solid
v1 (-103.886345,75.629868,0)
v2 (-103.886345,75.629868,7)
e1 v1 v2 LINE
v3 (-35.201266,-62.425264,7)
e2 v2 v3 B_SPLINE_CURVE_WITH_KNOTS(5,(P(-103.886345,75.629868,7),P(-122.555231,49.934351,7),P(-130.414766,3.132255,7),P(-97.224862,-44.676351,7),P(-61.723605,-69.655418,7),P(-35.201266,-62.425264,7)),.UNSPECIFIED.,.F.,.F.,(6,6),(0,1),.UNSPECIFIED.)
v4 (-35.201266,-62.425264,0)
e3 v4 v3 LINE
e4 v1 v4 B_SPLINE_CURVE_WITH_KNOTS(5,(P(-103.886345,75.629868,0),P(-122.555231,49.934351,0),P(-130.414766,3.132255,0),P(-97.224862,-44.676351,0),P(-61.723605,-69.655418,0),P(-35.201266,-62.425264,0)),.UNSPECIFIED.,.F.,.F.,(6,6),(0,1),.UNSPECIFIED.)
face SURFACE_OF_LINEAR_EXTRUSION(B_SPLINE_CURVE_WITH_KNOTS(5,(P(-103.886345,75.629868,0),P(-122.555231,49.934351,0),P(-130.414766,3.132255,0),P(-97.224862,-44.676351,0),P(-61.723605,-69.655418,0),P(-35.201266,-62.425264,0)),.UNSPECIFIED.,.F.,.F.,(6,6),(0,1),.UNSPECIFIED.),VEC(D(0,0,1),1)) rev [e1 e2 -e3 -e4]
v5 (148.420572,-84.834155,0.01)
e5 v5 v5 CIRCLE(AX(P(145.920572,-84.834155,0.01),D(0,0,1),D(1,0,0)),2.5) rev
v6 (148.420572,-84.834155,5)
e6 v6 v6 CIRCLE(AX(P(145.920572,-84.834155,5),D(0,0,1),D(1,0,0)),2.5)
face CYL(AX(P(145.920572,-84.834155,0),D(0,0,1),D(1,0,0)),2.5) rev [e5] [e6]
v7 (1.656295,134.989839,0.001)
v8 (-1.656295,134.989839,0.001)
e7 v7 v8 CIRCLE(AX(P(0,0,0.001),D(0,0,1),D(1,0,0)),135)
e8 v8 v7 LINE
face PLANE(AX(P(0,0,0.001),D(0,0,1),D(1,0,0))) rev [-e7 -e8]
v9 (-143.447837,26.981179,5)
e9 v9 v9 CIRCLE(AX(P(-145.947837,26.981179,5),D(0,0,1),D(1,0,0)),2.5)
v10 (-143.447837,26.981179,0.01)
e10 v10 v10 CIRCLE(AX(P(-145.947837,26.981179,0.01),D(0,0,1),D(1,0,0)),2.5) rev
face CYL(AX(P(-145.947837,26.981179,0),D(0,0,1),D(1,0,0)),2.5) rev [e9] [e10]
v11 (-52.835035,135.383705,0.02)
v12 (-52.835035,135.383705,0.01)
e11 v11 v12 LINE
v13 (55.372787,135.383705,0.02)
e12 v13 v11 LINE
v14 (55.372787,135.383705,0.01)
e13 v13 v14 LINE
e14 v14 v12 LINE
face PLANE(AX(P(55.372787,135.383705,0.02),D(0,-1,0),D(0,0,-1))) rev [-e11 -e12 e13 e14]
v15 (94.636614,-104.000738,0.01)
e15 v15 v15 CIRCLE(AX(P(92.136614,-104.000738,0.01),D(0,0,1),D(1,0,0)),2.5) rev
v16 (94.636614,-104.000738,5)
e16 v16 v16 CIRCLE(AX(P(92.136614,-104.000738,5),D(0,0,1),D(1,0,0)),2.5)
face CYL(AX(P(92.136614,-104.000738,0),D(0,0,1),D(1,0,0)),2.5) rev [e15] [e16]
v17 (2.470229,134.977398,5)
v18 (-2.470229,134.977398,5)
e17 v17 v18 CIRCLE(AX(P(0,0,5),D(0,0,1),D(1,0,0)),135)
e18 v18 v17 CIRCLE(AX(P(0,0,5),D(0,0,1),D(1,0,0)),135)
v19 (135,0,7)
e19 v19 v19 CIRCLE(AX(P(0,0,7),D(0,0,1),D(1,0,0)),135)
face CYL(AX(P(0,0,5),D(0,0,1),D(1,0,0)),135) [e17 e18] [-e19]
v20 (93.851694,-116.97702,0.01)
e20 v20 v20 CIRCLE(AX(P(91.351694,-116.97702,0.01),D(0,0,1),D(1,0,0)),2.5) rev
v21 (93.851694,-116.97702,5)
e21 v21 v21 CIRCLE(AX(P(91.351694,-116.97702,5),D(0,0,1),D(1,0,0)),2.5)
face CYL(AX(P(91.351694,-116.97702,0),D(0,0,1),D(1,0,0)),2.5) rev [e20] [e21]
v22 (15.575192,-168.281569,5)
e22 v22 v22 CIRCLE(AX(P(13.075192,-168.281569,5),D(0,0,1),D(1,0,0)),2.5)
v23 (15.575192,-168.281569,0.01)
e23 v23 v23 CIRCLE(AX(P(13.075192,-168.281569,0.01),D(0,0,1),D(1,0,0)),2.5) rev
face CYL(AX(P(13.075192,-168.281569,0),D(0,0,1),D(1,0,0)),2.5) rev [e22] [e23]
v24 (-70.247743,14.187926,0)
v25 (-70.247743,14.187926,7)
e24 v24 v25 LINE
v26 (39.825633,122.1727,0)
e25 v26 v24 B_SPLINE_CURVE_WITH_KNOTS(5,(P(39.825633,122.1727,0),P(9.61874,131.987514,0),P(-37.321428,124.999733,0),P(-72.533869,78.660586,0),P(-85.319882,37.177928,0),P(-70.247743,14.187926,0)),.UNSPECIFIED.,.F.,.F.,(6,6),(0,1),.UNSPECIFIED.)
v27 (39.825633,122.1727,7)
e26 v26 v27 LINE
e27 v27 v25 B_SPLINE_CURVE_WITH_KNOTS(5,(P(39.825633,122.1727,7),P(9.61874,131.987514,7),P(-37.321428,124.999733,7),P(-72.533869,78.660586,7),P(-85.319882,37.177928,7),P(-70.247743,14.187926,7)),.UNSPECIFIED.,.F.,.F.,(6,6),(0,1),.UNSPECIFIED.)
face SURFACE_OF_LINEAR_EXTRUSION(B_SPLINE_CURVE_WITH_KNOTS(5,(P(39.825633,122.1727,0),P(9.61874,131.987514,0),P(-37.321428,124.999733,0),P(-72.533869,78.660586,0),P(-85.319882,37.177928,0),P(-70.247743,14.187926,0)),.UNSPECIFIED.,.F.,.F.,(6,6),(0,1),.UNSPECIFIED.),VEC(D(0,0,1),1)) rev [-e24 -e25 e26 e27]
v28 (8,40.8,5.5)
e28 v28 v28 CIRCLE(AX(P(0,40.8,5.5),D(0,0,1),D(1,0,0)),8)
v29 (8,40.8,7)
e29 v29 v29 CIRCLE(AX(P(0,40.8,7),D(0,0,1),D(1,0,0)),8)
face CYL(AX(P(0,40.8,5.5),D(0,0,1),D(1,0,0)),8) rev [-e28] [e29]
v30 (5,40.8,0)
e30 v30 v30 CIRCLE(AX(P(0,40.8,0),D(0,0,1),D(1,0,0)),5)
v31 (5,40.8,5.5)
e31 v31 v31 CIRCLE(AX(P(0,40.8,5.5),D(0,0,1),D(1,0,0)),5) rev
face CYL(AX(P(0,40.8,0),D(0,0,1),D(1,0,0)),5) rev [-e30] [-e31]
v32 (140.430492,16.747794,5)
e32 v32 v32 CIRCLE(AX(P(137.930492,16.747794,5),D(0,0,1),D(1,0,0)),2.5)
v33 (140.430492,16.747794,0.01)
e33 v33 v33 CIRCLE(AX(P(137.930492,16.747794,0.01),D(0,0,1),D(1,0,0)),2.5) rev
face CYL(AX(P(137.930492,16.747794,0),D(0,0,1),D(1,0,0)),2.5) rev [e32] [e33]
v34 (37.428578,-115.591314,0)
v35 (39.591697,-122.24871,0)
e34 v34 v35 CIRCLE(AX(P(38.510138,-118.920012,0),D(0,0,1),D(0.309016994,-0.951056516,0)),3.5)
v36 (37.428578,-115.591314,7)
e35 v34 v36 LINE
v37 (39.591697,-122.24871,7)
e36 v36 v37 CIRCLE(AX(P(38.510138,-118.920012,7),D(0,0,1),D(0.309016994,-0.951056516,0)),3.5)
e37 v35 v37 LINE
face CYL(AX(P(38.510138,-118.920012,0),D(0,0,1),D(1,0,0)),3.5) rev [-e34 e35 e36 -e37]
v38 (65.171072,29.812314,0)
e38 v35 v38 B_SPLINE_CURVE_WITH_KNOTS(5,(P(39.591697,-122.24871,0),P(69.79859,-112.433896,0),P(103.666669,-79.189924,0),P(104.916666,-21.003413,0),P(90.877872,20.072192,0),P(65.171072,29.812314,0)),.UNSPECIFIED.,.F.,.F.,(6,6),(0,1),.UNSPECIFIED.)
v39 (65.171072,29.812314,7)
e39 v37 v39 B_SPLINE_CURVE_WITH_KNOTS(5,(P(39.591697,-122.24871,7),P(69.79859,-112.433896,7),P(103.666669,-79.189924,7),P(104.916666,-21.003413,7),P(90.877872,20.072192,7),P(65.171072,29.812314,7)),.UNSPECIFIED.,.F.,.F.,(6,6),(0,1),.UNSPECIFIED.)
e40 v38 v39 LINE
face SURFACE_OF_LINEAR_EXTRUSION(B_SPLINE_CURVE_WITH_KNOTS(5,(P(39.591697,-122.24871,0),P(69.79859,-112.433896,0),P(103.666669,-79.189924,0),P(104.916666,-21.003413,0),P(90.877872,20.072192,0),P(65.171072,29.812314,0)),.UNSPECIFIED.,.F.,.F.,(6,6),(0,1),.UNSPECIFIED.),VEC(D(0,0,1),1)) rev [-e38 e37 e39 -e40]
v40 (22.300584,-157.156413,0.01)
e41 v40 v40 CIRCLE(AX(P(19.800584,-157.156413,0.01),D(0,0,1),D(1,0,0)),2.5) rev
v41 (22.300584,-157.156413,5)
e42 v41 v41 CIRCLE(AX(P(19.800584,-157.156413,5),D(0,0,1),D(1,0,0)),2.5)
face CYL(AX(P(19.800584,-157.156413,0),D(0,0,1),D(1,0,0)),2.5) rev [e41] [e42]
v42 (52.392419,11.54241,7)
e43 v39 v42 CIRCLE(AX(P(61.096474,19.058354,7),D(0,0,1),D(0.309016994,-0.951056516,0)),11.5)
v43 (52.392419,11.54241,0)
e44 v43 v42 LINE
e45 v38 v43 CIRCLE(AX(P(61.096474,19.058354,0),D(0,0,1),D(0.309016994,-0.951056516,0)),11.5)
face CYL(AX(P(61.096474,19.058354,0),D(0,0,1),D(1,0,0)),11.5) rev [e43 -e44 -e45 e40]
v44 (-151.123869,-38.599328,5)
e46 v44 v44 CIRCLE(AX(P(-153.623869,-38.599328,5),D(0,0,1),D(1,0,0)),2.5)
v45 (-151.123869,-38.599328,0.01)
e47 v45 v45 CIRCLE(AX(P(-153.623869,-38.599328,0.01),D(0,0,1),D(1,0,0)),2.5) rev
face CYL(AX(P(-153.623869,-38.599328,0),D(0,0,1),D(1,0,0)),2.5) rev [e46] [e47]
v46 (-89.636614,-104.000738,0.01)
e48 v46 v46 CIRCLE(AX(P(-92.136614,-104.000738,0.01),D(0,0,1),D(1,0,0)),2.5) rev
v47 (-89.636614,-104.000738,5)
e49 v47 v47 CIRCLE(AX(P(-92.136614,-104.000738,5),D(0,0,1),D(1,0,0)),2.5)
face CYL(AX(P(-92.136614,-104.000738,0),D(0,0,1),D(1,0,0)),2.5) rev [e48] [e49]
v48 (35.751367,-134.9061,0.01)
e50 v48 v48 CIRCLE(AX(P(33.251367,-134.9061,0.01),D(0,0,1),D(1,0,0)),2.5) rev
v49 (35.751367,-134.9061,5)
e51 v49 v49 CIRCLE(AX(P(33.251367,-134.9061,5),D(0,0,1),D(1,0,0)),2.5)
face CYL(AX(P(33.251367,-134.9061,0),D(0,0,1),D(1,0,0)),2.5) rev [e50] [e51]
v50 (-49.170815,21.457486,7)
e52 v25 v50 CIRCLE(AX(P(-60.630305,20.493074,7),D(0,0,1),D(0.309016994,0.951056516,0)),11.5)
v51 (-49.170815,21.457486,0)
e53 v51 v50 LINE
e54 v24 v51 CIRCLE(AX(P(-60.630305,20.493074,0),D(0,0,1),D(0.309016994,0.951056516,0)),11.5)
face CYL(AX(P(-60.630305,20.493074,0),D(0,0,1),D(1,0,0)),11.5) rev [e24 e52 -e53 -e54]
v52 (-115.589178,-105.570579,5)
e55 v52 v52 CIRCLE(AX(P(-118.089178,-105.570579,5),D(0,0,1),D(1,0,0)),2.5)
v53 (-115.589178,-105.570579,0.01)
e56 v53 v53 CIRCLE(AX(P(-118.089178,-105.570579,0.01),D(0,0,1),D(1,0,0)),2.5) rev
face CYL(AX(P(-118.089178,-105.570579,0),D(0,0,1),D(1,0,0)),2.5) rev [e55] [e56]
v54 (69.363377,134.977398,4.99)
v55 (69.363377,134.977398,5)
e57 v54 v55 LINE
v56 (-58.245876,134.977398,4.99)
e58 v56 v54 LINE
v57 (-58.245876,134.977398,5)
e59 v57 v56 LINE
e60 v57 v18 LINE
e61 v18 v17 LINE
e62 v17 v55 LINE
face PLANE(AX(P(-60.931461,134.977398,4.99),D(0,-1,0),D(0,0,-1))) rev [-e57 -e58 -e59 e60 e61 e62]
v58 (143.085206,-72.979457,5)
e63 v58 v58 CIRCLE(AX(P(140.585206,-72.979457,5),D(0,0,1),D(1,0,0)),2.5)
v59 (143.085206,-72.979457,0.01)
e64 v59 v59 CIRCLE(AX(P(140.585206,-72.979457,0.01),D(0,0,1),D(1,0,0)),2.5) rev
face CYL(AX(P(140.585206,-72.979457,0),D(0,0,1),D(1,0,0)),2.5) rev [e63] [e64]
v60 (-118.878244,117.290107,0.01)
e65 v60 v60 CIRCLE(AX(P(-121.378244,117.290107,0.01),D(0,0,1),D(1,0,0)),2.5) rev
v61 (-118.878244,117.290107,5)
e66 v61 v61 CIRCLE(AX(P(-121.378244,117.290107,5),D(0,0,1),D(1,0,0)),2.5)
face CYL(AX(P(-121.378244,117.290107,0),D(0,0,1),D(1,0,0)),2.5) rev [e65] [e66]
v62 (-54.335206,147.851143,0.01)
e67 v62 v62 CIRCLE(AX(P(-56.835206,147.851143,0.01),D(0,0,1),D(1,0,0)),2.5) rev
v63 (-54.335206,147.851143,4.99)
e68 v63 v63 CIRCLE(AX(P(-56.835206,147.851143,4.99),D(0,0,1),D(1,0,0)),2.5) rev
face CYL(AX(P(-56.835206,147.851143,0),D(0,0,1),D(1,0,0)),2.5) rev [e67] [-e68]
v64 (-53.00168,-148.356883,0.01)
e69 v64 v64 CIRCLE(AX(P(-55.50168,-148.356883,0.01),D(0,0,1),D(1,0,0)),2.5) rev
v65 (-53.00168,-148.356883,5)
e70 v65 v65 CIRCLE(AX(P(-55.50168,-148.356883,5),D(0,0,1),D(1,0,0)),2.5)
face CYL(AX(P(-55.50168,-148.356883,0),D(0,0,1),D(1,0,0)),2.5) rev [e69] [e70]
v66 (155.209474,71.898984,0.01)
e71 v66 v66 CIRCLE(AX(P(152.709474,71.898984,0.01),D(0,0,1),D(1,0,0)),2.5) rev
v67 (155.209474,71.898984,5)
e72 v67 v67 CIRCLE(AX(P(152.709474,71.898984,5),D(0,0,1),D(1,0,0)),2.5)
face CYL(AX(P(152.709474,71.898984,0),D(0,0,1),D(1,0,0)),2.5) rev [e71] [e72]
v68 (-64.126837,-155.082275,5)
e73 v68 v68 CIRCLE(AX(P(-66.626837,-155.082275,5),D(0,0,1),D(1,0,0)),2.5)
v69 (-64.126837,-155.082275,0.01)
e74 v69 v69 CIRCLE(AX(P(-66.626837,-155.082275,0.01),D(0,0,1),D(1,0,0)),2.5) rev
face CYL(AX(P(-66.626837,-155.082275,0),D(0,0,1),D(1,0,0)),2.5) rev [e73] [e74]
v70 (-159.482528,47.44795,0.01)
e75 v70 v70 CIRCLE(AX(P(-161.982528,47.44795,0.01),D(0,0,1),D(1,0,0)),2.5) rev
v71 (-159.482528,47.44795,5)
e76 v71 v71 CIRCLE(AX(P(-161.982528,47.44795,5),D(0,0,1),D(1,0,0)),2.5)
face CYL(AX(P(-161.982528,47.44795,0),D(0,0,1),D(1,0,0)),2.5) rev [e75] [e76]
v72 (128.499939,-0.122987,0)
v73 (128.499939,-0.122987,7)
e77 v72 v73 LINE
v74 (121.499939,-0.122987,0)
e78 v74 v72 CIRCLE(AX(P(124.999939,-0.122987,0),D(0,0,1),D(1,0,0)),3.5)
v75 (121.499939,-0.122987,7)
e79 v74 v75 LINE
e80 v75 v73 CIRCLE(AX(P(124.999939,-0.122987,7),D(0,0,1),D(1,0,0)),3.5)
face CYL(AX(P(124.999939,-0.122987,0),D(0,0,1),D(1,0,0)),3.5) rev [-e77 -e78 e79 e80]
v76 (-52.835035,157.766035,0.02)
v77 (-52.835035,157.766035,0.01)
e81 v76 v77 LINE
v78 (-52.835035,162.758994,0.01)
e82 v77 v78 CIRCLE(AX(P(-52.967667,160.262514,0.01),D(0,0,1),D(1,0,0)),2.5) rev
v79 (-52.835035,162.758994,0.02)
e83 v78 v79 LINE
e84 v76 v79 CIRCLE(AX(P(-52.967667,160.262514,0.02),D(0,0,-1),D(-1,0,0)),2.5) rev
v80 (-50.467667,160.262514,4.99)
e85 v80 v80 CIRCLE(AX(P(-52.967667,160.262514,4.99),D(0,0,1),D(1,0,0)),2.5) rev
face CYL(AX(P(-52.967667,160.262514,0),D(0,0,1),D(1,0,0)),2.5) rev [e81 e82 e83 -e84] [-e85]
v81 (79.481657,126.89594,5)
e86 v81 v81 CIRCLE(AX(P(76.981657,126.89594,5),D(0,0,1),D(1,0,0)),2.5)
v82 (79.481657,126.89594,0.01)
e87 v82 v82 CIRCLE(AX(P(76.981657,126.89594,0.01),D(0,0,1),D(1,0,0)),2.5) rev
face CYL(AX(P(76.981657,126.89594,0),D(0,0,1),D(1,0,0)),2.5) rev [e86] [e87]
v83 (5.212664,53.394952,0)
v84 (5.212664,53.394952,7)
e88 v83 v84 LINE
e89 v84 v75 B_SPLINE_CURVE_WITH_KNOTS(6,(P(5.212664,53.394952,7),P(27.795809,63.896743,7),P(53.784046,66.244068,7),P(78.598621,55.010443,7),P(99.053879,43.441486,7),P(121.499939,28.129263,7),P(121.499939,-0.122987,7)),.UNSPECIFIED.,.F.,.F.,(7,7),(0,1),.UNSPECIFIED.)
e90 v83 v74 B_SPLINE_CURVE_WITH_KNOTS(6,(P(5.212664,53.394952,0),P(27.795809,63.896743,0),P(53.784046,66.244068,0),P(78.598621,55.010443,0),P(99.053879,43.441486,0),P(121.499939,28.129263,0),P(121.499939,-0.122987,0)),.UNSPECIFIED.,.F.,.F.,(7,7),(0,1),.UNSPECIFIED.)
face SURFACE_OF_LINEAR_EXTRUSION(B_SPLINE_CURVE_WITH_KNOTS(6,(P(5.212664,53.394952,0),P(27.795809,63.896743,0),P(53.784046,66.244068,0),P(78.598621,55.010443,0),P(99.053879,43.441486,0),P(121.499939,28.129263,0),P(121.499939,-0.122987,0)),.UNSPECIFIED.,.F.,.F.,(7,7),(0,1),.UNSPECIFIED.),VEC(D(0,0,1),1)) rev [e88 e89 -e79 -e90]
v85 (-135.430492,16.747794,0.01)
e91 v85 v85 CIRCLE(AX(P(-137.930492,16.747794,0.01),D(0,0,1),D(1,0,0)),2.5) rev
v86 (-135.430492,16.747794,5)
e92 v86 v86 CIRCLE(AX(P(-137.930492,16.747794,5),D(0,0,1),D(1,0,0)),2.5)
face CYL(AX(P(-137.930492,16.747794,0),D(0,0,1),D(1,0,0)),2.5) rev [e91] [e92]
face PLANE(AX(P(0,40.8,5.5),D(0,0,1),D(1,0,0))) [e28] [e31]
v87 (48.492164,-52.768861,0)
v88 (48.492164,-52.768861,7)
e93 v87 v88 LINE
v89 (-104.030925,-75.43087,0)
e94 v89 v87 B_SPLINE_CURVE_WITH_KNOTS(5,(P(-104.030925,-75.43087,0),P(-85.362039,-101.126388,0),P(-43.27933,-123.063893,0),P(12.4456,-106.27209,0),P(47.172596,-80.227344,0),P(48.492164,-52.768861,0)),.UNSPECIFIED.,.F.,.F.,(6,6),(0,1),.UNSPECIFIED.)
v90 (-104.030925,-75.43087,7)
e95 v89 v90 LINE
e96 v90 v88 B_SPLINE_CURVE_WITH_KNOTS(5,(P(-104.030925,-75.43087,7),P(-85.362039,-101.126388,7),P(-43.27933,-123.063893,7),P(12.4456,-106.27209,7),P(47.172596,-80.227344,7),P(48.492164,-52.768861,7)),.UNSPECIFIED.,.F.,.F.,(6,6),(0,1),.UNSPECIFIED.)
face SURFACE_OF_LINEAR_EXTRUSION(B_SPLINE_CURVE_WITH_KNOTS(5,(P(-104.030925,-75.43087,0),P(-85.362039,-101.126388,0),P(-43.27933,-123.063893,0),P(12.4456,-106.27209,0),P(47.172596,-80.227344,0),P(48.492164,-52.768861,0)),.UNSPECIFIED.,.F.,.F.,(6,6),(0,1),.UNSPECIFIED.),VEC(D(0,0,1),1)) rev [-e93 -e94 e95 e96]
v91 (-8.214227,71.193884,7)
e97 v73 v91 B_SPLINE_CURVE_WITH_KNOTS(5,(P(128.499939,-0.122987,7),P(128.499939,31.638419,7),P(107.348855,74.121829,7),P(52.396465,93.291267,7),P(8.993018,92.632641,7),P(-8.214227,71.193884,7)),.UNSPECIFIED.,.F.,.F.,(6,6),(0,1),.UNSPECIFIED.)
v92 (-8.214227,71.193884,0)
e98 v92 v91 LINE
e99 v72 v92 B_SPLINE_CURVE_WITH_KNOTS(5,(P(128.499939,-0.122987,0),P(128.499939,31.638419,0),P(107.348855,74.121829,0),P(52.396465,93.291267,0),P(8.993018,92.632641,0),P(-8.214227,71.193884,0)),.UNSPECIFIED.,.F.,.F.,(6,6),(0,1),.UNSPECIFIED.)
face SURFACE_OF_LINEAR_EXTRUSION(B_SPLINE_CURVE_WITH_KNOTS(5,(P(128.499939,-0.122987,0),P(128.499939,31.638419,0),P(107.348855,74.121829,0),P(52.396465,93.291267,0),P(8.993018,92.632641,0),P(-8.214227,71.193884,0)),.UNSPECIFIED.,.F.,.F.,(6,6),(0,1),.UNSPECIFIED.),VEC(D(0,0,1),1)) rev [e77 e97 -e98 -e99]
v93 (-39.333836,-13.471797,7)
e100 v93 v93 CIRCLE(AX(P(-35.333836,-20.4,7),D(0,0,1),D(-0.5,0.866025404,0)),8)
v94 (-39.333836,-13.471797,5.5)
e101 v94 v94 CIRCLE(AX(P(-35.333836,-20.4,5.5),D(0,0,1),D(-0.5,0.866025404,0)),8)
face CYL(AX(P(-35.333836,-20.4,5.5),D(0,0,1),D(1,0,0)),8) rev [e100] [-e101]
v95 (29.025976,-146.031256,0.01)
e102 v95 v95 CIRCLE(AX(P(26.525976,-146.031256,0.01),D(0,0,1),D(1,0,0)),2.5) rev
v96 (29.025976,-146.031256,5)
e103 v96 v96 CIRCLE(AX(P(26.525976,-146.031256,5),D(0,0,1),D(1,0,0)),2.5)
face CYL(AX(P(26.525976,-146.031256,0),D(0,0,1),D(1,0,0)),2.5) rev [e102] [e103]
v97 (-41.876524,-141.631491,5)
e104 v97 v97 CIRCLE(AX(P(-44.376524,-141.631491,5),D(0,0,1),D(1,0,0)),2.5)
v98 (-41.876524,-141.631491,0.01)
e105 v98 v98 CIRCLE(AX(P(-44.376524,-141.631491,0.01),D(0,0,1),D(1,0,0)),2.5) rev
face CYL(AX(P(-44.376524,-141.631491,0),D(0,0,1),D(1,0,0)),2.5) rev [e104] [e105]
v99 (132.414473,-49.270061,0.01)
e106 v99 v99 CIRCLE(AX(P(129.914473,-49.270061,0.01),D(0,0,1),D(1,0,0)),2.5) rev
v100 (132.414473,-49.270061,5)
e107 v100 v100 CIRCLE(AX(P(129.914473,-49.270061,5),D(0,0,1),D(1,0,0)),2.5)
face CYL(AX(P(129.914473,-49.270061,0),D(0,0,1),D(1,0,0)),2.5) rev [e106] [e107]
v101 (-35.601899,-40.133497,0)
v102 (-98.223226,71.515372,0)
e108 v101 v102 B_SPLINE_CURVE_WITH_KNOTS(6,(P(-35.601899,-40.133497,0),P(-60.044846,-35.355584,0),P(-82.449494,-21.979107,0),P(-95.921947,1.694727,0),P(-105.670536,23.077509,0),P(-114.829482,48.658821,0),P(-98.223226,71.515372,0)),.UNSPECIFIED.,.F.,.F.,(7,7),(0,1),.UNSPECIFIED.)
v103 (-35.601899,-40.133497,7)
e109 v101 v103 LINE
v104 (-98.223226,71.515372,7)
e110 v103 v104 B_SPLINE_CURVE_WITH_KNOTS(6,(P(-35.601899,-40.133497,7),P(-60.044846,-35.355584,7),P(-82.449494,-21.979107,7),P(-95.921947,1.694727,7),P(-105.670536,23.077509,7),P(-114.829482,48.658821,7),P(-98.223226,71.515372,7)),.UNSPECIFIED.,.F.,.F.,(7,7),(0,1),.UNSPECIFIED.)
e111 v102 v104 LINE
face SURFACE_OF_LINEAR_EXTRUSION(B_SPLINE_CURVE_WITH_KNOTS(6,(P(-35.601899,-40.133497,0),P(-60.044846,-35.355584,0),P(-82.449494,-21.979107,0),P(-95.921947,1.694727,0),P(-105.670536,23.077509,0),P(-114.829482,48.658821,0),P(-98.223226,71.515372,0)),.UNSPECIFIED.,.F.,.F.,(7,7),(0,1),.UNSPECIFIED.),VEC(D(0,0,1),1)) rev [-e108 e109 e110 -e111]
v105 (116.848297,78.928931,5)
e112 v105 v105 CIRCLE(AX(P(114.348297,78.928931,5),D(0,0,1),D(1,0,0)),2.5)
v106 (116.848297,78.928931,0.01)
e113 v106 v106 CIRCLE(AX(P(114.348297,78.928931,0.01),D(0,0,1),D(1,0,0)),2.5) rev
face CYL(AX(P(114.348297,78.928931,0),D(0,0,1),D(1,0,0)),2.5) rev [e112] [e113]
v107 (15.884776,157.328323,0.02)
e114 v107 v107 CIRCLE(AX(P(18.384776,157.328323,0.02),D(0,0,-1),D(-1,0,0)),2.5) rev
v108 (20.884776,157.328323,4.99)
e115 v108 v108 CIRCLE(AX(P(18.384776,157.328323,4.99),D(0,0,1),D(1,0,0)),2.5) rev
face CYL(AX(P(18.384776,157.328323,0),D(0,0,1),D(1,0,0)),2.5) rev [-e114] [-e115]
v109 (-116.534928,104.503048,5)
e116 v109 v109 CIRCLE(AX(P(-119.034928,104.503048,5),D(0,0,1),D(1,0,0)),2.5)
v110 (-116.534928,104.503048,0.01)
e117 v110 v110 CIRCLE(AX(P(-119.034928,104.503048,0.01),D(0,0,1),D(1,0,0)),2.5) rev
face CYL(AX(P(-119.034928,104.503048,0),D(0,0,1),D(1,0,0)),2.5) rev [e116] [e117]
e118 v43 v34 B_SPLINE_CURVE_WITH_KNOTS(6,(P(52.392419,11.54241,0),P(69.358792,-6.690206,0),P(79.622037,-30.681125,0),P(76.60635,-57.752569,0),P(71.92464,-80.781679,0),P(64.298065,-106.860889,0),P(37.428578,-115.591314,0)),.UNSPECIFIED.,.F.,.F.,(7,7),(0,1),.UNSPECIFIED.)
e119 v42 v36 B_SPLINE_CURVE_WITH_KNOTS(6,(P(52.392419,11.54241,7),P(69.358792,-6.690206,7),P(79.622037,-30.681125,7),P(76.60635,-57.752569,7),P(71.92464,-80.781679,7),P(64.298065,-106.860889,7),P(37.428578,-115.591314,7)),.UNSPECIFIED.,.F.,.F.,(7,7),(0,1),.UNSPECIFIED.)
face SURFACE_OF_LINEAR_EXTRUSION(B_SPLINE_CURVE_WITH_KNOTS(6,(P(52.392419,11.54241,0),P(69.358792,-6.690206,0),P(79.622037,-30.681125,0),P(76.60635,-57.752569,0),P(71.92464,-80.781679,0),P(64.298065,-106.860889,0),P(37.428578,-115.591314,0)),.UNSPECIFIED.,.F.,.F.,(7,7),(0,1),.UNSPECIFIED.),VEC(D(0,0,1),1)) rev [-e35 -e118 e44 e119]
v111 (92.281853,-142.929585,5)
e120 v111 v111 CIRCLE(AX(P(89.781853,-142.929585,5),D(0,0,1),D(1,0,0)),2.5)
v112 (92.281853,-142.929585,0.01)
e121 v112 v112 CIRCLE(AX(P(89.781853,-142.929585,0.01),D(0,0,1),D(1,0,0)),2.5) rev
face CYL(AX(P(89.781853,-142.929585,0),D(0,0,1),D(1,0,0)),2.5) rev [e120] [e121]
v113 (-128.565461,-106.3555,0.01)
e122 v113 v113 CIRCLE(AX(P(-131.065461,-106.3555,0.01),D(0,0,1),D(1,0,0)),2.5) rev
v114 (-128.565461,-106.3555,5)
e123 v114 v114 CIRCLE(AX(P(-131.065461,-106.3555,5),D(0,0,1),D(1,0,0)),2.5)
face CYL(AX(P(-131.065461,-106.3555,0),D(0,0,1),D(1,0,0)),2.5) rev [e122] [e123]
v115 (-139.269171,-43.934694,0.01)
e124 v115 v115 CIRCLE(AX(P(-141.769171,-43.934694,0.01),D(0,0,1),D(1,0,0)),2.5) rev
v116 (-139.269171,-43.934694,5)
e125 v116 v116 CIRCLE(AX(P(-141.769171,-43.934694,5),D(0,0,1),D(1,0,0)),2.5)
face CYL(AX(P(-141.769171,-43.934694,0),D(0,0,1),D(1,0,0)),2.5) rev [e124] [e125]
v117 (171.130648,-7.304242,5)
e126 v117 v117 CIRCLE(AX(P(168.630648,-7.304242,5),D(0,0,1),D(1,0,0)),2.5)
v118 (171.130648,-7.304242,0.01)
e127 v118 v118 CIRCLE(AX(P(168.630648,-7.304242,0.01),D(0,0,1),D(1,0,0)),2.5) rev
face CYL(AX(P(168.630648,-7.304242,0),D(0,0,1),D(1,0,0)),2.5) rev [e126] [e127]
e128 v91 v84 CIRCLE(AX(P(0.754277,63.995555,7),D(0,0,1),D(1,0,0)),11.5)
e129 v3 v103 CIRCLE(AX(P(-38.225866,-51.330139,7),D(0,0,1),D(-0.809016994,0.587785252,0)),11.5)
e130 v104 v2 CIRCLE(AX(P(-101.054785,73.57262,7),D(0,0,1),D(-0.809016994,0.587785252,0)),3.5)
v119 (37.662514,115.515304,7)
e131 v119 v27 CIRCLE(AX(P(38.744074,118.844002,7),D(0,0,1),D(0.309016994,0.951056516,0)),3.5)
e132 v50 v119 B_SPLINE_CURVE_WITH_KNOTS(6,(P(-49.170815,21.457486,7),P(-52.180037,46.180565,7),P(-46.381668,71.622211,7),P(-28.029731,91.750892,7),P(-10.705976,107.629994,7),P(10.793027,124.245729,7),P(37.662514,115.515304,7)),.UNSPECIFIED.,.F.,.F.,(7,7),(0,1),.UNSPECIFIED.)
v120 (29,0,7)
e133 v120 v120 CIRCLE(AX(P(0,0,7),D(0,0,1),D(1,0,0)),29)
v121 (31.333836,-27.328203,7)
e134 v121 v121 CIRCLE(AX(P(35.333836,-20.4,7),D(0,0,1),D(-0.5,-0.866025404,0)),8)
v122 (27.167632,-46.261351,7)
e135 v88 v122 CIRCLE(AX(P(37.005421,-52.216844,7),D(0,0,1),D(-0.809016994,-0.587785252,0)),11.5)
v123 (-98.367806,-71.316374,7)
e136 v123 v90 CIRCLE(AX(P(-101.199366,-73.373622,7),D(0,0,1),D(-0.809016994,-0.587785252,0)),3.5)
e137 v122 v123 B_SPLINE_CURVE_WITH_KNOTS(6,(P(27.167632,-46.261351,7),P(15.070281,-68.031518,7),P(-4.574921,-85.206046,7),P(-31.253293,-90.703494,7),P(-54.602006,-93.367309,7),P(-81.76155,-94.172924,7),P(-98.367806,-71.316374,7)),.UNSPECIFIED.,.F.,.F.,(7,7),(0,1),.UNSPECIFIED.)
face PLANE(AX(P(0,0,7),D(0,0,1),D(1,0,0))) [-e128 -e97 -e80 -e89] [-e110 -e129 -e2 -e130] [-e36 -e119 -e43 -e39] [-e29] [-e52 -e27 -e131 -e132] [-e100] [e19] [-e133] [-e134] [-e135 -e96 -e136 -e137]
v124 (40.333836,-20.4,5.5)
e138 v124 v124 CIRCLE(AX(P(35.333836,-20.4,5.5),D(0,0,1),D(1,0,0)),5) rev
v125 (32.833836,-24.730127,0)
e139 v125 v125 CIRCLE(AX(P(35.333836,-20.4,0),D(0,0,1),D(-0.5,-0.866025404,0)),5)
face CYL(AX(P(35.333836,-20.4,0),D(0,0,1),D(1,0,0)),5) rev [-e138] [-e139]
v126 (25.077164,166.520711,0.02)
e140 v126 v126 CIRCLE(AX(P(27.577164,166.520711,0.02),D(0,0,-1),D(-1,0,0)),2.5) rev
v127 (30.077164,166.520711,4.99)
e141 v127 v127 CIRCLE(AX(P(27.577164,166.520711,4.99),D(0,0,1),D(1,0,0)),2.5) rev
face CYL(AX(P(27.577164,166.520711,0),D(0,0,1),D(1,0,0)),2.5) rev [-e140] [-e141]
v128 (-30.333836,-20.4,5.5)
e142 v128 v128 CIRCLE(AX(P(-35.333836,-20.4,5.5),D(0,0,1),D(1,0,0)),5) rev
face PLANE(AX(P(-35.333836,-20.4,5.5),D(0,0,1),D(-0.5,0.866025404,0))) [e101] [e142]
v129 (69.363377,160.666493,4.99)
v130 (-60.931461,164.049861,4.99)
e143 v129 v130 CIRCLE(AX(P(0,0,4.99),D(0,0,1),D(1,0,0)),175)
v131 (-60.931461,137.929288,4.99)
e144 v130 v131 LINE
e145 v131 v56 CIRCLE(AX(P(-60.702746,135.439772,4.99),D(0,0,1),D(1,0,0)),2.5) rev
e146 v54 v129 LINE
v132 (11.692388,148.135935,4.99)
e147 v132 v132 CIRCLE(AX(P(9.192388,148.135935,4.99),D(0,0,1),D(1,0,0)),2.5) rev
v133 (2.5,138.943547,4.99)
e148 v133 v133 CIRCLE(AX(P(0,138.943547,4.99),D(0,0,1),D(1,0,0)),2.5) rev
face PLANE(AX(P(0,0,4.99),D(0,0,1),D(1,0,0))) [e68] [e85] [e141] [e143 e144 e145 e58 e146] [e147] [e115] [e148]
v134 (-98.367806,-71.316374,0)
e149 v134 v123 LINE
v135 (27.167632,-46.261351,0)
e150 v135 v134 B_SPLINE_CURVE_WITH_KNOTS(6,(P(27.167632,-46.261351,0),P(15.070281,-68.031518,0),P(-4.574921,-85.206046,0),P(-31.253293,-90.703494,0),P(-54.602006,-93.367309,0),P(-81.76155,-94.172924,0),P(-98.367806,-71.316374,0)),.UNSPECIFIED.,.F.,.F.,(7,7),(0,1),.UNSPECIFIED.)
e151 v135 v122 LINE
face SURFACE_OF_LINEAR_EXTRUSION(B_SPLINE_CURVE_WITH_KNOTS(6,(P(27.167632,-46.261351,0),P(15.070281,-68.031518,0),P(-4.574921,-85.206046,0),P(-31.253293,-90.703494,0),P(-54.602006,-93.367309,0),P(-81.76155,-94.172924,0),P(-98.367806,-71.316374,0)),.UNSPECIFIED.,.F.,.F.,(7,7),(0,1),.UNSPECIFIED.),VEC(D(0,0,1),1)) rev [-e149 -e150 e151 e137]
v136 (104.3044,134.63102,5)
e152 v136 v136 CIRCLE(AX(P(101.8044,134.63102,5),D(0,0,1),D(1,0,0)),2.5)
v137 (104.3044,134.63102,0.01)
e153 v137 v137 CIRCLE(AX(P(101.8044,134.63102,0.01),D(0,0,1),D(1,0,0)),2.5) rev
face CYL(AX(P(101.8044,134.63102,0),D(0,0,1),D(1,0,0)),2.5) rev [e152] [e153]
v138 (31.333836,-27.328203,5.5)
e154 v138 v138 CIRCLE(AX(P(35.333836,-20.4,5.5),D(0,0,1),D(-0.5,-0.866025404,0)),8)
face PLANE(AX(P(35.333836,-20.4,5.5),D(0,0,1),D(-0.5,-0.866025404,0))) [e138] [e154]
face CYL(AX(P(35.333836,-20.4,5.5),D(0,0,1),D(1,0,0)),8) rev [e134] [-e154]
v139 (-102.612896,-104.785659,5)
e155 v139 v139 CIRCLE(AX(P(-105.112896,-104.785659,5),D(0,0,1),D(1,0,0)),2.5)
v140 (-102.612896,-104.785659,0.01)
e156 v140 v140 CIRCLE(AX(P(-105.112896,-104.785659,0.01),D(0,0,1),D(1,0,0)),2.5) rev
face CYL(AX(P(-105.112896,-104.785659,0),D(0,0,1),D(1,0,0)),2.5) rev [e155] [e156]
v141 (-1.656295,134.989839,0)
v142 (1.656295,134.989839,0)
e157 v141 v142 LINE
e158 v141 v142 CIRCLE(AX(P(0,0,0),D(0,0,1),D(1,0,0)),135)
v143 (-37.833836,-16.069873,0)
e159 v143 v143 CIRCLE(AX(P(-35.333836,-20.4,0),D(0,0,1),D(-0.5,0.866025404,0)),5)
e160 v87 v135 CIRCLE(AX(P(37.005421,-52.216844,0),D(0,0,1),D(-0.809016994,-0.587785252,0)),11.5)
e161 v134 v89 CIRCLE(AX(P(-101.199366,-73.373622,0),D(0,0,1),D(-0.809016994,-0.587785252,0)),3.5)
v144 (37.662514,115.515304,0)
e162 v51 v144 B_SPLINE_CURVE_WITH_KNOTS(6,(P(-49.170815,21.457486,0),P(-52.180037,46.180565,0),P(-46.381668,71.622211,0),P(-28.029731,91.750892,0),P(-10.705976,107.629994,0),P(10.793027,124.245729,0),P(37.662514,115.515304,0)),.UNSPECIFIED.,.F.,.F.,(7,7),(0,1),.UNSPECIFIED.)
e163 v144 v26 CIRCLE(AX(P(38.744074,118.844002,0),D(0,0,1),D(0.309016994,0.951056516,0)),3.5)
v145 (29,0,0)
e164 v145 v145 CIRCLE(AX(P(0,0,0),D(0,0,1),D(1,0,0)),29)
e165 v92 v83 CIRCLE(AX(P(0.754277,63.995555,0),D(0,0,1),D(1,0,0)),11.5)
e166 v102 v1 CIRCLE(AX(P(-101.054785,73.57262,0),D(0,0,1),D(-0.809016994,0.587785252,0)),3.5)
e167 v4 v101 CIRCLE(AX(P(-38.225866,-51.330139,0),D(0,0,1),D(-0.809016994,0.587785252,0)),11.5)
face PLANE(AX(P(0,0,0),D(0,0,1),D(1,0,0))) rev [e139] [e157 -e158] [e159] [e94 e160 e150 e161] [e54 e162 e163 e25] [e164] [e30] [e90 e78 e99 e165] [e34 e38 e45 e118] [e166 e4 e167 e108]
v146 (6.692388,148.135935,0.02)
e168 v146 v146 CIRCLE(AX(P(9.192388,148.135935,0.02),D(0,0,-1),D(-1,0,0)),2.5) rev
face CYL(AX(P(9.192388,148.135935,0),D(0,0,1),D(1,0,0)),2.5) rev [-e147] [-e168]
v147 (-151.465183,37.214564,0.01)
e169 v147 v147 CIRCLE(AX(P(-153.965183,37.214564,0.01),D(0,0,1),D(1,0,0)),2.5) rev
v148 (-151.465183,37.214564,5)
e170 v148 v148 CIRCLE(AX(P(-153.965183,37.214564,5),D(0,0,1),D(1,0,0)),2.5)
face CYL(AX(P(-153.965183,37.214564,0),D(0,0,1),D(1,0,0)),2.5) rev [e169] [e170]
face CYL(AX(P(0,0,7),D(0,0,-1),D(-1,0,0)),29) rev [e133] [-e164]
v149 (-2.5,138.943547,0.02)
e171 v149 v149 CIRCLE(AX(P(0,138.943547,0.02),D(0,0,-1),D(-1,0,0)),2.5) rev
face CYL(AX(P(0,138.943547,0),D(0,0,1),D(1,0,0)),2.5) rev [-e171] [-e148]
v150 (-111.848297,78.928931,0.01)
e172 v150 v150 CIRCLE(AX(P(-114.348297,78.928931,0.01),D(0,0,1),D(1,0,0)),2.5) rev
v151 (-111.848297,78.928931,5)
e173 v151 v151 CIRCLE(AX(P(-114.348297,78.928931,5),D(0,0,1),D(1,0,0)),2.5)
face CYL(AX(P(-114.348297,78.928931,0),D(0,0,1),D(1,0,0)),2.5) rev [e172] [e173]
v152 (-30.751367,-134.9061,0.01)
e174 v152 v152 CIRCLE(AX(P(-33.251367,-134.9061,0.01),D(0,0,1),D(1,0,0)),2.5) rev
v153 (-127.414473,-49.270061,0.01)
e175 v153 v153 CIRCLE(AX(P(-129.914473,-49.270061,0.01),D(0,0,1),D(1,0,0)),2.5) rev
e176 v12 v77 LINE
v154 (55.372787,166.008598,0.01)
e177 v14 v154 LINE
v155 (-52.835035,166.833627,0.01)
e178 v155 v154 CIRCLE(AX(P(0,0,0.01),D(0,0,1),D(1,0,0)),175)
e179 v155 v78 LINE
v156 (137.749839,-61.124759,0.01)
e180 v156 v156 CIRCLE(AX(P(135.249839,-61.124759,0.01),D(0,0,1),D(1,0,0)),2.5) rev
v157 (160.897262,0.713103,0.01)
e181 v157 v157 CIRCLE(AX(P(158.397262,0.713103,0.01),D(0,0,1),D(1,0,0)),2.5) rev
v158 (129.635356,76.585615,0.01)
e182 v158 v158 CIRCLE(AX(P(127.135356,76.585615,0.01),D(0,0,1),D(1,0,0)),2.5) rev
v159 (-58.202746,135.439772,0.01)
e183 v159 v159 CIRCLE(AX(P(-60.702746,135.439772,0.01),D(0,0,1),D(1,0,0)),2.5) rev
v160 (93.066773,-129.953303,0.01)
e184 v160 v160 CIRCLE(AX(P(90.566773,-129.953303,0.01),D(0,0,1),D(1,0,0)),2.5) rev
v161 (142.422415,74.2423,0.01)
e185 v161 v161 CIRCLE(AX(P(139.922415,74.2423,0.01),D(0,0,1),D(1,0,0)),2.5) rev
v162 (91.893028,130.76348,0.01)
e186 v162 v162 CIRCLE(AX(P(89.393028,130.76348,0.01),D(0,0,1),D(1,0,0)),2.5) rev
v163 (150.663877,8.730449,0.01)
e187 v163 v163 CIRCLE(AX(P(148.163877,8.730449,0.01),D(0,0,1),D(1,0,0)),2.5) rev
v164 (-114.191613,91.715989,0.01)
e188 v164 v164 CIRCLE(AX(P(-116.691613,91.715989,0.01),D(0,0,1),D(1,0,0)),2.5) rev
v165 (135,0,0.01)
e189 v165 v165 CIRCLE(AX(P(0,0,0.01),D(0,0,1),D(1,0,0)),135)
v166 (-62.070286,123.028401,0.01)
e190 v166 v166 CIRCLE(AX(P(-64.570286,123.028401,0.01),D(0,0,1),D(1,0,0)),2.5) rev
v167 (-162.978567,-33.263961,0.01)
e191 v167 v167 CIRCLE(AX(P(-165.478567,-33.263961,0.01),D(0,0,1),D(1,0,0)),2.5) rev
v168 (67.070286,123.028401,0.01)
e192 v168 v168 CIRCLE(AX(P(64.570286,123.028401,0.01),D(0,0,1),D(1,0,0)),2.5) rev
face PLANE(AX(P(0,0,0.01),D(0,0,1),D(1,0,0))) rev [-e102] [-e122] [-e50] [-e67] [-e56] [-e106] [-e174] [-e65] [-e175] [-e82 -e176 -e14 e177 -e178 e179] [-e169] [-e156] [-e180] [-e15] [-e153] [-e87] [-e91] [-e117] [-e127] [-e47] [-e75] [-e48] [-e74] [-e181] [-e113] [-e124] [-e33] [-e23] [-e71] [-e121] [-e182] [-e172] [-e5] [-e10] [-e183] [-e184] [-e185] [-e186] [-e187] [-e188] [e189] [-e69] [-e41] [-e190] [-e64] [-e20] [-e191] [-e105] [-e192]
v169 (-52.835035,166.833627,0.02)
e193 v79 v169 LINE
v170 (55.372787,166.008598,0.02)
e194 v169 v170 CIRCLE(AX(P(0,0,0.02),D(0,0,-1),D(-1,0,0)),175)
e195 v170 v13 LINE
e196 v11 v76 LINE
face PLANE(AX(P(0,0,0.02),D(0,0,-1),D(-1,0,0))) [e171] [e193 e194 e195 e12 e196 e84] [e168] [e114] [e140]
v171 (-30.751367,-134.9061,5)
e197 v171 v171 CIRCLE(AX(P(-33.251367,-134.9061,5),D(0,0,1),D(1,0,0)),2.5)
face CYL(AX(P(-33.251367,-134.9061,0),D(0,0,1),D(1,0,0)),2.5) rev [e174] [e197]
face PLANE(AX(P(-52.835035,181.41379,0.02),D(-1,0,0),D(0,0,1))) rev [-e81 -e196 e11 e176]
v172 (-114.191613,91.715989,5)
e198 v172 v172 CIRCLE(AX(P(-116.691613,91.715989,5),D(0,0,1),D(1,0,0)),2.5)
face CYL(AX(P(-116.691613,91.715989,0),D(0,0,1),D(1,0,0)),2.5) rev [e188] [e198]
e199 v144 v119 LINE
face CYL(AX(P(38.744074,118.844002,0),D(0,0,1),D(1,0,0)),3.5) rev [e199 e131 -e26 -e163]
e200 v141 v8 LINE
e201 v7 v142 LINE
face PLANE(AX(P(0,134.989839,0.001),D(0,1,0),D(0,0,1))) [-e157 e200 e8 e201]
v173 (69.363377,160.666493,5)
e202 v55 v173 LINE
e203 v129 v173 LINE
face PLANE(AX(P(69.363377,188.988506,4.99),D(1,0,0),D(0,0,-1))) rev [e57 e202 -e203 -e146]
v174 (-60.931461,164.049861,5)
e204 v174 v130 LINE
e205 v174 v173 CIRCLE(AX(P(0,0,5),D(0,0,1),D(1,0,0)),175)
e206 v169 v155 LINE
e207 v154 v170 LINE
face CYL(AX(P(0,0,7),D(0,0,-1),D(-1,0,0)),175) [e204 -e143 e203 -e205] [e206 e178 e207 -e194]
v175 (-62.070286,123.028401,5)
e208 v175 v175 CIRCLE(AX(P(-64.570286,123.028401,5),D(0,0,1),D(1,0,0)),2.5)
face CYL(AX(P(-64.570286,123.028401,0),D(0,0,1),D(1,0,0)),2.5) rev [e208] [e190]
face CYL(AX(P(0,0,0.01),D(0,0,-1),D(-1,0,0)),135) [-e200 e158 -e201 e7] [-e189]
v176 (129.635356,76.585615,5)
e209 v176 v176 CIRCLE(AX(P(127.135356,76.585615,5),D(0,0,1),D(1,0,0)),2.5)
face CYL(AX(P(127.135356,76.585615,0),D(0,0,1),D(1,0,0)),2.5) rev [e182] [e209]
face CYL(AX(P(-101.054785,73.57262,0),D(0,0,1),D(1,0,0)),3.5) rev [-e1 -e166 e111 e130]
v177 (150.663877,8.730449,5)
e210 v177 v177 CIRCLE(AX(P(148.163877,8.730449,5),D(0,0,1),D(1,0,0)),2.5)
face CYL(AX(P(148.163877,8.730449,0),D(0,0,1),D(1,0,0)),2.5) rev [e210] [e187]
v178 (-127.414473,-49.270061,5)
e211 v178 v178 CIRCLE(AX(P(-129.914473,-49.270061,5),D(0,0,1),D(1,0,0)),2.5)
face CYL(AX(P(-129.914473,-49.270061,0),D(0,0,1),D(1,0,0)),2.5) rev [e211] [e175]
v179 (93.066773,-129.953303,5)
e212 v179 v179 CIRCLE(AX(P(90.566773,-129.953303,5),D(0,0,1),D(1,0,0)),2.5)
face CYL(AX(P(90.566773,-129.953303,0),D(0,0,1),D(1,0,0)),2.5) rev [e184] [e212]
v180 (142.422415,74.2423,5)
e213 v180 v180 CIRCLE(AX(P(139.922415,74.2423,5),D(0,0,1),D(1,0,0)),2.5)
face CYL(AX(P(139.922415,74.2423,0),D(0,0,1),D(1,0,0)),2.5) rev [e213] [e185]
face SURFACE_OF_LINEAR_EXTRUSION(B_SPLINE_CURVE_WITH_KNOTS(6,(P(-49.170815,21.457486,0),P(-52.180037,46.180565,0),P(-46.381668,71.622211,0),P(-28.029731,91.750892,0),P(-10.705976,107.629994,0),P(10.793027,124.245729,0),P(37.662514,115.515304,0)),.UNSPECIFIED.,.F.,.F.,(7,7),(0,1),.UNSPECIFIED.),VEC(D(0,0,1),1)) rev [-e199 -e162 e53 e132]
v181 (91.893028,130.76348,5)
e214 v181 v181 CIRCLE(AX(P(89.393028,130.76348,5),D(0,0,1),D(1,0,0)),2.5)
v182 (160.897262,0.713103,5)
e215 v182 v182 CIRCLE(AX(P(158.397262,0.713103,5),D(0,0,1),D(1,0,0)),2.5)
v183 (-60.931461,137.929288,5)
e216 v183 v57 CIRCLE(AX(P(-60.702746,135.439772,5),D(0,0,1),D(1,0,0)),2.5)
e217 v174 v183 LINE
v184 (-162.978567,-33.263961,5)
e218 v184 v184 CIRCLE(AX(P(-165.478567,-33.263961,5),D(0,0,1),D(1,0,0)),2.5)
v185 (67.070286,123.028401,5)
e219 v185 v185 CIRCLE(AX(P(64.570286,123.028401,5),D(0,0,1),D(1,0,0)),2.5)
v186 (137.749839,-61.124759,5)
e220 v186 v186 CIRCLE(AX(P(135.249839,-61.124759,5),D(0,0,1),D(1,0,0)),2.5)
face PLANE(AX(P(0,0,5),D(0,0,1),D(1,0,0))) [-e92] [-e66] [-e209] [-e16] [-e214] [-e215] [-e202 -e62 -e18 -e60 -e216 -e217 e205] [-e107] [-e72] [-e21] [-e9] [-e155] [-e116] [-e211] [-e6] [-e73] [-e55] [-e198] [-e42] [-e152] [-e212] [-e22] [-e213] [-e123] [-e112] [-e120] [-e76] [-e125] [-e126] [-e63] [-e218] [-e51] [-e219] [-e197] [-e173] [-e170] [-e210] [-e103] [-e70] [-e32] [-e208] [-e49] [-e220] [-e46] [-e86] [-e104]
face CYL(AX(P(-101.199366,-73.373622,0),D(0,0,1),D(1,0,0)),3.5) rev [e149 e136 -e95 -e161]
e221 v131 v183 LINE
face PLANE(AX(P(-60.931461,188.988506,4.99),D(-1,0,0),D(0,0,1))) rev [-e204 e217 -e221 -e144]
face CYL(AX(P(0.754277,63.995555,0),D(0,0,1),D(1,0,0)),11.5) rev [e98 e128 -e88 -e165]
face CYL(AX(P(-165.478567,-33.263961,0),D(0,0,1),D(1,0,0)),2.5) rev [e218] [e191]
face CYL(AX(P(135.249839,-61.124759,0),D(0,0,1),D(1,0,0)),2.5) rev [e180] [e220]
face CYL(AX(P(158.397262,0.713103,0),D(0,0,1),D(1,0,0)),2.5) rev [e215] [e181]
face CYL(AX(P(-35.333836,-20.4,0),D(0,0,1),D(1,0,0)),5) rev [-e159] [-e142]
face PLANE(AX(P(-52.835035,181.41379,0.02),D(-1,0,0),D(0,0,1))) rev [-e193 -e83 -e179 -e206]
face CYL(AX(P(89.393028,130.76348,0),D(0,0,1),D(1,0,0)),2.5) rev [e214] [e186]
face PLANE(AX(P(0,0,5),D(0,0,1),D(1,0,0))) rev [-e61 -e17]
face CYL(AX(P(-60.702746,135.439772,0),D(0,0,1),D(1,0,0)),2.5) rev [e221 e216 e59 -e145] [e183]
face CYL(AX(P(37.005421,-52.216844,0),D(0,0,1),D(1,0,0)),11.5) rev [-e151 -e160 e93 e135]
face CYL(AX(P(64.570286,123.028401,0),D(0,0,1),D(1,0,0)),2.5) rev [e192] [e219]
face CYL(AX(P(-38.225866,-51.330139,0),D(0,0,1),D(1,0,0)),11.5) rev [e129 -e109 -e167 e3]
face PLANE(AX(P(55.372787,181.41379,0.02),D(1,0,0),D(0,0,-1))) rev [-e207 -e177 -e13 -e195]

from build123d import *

# Parameters (mm, degrees)
SKETCH1_R           = 175
SKETCH1_R_2         = 29
BOSS_EXTRUDE1_DEPTH = 7
CUT_EXTRUDE1_START  = -2
SKETCH2_R           = 175
SKETCH2_R_2         = 135
CUT_EXTRUDE1_DEPTH  = 2
SKETCH3_R           = 5
CUT_EXTRUDE2_DEPTH  = 248.586348574
CIRPATTERN1_COUNT   = 3
SKETCH4_R           = 8
CUT_EXTRUDE3_DEPTH  = 1.5
CIRPATTERN2_COUNT   = 3
CUT_EXTRUDE5_START  = -7
CUT_EXTRUDE5_DEPTH  = 7
CIRPATTERN3_COUNT   = 5
SKETCH6_R           = 2.5
CUT_EXTRUDE6_DEPTH  = 248.586348718
CIRPATTERN4_COUNT   = 13
SKETCH8_R           = 175
SKETCH8_R_2         = 135
CUT_EXTRUDE7_DEPTH  = 0.01
SKETCH9_W           = 90.900327039
SKETCH9_H           = 40.914041524
CUT_EXTRUDE8_DEPTH  = 0.001
SKETCH10_W          = 130.294838349
SKETCH10_H          = 54.011108205
CUT_EXTRUDE9_DEPTH  = 0.01
SKETCH11_W          = 108.207821592
SKETCH11_H          = 46.030085343
CUT_EXTRUDE10_DEPTH = 0.01


# Read off the part's stored shape, not the designer's step: Cut-Extrude5
with BuildPart() as part:
    # Sketch1 → Boss-Extrude1 (new body)
    with BuildSketch(Plane.XY):
        Circle(SKETCH1_R)
        Circle(SKETCH1_R_2, mode=Mode.SUBTRACT)
    extrude(amount=BOSS_EXTRUDE1_DEPTH)

    # Sketch2 → Cut-Extrude1 (cut)
    with BuildSketch(Plane.XY.offset(7).offset(CUT_EXTRUDE1_START)):
        Circle(SKETCH2_R)
        Circle(SKETCH2_R_2, mode=Mode.SUBTRACT)
    extrude(amount=CUT_EXTRUDE1_DEPTH, mode=Mode.SUBTRACT)

    # Sketch3 → Cut-Extrude2 (cut, through all)
    with BuildSketch(Plane.XY.offset(7)):
        with Locations((0, 40.8)):
            Circle(SKETCH3_R)
    cut_extrude2 = extrude(amount=-CUT_EXTRUDE2_DEPTH, mode=Mode.SUBTRACT)

    # CirPattern1: Cut-Extrude2 ×3 about axis
    cirpattern1_axis = Axis((0, 0, 0), (0, 0, 1))
    for i in range(1, CIRPATTERN1_COUNT):
        add(cut_extrude2.rotate(cirpattern1_axis, i * 360 / CIRPATTERN1_COUNT), mode=Mode.SUBTRACT)

    # Sketch4 → Cut-Extrude3 (cut)
    with BuildSketch(Plane.XY.offset(7)):
        with Locations((0, 40.8)):
            Circle(SKETCH4_R)
    cut_extrude3 = extrude(amount=-CUT_EXTRUDE3_DEPTH, mode=Mode.SUBTRACT)

    # CirPattern2: Cut-Extrude3 ×3 about axis
    cirpattern2_axis = Axis((0, 0, 0), (0, 0, 1))
    for i in range(1, CIRPATTERN2_COUNT):
        add(cut_extrude3.rotate(cirpattern2_axis, i * 360 / CIRPATTERN2_COUNT), mode=Mode.SUBTRACT)

    # Cut-Extrude5 outline → Cut-Extrude5 (cut)
    with BuildSketch(Plane.XY.offset(7).offset(CUT_EXTRUDE5_START)):
        with BuildLine():
            ThreePointArc((121.499939496, -0.12298749), (124.999939496, -3.62298749), (128.499939496, -0.12298749))
            add(Edge.make_bspline(
                [(128.499939496, -0.12298749), (128.499939496, 31.638419222), (107.348855254, 74.121828628), (52.396465064, 93.291267066), (8.993017656, 92.632641356), (-8.214226951, 71.193884394)],
                knots=[0, 0, 0, 0, 0, 0, 1, 1, 1, 1, 1, 1], degree=5))
            ThreePointArc((-8.214226951, 71.193884394), (-8.426452431, 57.069934817), (5.212663873, 53.394952133))
            add(Edge.make_bspline(
                [(5.212663873, 53.394952133), (27.795809489, 63.896743321), (53.784046438, 66.244067949), (78.598621074, 55.010442945), (99.053878543, 43.441485852), (121.499939496, 28.129262896), (121.499939496, -0.12298749)],
                knots=[0, 0, 0, 0, 0, 0, 0, 1, 1, 1, 1, 1, 1, 1], degree=6))
        make_face()
    cut_extrude5 = extrude(amount=CUT_EXTRUDE5_DEPTH, mode=Mode.SUBTRACT)

    # CirPattern3: Cut-Extrude5 ×5 about axis
    cirpattern3_axis = Axis((0, 0, 7), (0, 0, 1))
    for i in range(1, CIRPATTERN3_COUNT):
        add(cut_extrude5.rotate(cirpattern3_axis, i * 360 / CIRPATTERN3_COUNT), mode=Mode.SUBTRACT)

    # Sketch6 → Cut-Extrude6 (cut, through all)
    with BuildSketch(Plane.XY.offset(7)):
        with Locations((0, 138.943546743)):
            Circle(SKETCH6_R)
        with Locations((9.192388155, 148.135934899)):
            Circle(SKETCH6_R)
        with Locations((18.384776311, 157.328323054)):
            Circle(SKETCH6_R)
        with Locations((27.577164466, 166.520711209)):
            Circle(SKETCH6_R)
    cut_extrude6 = extrude(amount=-CUT_EXTRUDE6_DEPTH, mode=Mode.SUBTRACT)

    # CirPattern4: Cut-Extrude6 ×13 about axis
    cirpattern4_axis = Axis((0, 0, 0), (0, 0, 1))
    for i in range(1, CIRPATTERN4_COUNT):
        add(cut_extrude6.rotate(cirpattern4_axis, i * 360 / CIRPATTERN4_COUNT), mode=Mode.SUBTRACT)

    # Sketch8 → Cut-Extrude7 (cut)
    with BuildSketch(Plane.XY):
        Circle(SKETCH8_R)
        Circle(SKETCH8_R_2, mode=Mode.SUBTRACT)
    extrude(amount=CUT_EXTRUDE7_DEPTH, mode=Mode.SUBTRACT)

    # Sketch9 → Cut-Extrude8 (cut)
    with BuildSketch(Plane.XY):
        with Locations((4.527748237, 155.446859957)):
            Rectangle(SKETCH9_W, SKETCH9_H)
    extrude(amount=CUT_EXTRUDE8_DEPTH, mode=Mode.SUBTRACT)

    # Sketch10 → Cut-Extrude9 (cut)
    with BuildSketch(Plane.XY.offset(5)):
        with Locations((4.215957898, 161.982952097)):
            Rectangle(SKETCH10_W, SKETCH10_H)
    extrude(amount=-CUT_EXTRUDE9_DEPTH, mode=Mode.SUBTRACT)

    # Sketch11 → Cut-Extrude10 (cut)
    with BuildSketch(Plane(origin=(0, 0, 0.01), x_dir=(-1, 0, 0), z_dir=(0, 0, -1))):
        with Locations((-1.268876231, 158.398747535)):
            Rectangle(SKETCH11_W, SKETCH11_H)
    extrude(amount=-CUT_EXTRUDE10_DEPTH, mode=Mode.SUBTRACT)


solid = part.part
